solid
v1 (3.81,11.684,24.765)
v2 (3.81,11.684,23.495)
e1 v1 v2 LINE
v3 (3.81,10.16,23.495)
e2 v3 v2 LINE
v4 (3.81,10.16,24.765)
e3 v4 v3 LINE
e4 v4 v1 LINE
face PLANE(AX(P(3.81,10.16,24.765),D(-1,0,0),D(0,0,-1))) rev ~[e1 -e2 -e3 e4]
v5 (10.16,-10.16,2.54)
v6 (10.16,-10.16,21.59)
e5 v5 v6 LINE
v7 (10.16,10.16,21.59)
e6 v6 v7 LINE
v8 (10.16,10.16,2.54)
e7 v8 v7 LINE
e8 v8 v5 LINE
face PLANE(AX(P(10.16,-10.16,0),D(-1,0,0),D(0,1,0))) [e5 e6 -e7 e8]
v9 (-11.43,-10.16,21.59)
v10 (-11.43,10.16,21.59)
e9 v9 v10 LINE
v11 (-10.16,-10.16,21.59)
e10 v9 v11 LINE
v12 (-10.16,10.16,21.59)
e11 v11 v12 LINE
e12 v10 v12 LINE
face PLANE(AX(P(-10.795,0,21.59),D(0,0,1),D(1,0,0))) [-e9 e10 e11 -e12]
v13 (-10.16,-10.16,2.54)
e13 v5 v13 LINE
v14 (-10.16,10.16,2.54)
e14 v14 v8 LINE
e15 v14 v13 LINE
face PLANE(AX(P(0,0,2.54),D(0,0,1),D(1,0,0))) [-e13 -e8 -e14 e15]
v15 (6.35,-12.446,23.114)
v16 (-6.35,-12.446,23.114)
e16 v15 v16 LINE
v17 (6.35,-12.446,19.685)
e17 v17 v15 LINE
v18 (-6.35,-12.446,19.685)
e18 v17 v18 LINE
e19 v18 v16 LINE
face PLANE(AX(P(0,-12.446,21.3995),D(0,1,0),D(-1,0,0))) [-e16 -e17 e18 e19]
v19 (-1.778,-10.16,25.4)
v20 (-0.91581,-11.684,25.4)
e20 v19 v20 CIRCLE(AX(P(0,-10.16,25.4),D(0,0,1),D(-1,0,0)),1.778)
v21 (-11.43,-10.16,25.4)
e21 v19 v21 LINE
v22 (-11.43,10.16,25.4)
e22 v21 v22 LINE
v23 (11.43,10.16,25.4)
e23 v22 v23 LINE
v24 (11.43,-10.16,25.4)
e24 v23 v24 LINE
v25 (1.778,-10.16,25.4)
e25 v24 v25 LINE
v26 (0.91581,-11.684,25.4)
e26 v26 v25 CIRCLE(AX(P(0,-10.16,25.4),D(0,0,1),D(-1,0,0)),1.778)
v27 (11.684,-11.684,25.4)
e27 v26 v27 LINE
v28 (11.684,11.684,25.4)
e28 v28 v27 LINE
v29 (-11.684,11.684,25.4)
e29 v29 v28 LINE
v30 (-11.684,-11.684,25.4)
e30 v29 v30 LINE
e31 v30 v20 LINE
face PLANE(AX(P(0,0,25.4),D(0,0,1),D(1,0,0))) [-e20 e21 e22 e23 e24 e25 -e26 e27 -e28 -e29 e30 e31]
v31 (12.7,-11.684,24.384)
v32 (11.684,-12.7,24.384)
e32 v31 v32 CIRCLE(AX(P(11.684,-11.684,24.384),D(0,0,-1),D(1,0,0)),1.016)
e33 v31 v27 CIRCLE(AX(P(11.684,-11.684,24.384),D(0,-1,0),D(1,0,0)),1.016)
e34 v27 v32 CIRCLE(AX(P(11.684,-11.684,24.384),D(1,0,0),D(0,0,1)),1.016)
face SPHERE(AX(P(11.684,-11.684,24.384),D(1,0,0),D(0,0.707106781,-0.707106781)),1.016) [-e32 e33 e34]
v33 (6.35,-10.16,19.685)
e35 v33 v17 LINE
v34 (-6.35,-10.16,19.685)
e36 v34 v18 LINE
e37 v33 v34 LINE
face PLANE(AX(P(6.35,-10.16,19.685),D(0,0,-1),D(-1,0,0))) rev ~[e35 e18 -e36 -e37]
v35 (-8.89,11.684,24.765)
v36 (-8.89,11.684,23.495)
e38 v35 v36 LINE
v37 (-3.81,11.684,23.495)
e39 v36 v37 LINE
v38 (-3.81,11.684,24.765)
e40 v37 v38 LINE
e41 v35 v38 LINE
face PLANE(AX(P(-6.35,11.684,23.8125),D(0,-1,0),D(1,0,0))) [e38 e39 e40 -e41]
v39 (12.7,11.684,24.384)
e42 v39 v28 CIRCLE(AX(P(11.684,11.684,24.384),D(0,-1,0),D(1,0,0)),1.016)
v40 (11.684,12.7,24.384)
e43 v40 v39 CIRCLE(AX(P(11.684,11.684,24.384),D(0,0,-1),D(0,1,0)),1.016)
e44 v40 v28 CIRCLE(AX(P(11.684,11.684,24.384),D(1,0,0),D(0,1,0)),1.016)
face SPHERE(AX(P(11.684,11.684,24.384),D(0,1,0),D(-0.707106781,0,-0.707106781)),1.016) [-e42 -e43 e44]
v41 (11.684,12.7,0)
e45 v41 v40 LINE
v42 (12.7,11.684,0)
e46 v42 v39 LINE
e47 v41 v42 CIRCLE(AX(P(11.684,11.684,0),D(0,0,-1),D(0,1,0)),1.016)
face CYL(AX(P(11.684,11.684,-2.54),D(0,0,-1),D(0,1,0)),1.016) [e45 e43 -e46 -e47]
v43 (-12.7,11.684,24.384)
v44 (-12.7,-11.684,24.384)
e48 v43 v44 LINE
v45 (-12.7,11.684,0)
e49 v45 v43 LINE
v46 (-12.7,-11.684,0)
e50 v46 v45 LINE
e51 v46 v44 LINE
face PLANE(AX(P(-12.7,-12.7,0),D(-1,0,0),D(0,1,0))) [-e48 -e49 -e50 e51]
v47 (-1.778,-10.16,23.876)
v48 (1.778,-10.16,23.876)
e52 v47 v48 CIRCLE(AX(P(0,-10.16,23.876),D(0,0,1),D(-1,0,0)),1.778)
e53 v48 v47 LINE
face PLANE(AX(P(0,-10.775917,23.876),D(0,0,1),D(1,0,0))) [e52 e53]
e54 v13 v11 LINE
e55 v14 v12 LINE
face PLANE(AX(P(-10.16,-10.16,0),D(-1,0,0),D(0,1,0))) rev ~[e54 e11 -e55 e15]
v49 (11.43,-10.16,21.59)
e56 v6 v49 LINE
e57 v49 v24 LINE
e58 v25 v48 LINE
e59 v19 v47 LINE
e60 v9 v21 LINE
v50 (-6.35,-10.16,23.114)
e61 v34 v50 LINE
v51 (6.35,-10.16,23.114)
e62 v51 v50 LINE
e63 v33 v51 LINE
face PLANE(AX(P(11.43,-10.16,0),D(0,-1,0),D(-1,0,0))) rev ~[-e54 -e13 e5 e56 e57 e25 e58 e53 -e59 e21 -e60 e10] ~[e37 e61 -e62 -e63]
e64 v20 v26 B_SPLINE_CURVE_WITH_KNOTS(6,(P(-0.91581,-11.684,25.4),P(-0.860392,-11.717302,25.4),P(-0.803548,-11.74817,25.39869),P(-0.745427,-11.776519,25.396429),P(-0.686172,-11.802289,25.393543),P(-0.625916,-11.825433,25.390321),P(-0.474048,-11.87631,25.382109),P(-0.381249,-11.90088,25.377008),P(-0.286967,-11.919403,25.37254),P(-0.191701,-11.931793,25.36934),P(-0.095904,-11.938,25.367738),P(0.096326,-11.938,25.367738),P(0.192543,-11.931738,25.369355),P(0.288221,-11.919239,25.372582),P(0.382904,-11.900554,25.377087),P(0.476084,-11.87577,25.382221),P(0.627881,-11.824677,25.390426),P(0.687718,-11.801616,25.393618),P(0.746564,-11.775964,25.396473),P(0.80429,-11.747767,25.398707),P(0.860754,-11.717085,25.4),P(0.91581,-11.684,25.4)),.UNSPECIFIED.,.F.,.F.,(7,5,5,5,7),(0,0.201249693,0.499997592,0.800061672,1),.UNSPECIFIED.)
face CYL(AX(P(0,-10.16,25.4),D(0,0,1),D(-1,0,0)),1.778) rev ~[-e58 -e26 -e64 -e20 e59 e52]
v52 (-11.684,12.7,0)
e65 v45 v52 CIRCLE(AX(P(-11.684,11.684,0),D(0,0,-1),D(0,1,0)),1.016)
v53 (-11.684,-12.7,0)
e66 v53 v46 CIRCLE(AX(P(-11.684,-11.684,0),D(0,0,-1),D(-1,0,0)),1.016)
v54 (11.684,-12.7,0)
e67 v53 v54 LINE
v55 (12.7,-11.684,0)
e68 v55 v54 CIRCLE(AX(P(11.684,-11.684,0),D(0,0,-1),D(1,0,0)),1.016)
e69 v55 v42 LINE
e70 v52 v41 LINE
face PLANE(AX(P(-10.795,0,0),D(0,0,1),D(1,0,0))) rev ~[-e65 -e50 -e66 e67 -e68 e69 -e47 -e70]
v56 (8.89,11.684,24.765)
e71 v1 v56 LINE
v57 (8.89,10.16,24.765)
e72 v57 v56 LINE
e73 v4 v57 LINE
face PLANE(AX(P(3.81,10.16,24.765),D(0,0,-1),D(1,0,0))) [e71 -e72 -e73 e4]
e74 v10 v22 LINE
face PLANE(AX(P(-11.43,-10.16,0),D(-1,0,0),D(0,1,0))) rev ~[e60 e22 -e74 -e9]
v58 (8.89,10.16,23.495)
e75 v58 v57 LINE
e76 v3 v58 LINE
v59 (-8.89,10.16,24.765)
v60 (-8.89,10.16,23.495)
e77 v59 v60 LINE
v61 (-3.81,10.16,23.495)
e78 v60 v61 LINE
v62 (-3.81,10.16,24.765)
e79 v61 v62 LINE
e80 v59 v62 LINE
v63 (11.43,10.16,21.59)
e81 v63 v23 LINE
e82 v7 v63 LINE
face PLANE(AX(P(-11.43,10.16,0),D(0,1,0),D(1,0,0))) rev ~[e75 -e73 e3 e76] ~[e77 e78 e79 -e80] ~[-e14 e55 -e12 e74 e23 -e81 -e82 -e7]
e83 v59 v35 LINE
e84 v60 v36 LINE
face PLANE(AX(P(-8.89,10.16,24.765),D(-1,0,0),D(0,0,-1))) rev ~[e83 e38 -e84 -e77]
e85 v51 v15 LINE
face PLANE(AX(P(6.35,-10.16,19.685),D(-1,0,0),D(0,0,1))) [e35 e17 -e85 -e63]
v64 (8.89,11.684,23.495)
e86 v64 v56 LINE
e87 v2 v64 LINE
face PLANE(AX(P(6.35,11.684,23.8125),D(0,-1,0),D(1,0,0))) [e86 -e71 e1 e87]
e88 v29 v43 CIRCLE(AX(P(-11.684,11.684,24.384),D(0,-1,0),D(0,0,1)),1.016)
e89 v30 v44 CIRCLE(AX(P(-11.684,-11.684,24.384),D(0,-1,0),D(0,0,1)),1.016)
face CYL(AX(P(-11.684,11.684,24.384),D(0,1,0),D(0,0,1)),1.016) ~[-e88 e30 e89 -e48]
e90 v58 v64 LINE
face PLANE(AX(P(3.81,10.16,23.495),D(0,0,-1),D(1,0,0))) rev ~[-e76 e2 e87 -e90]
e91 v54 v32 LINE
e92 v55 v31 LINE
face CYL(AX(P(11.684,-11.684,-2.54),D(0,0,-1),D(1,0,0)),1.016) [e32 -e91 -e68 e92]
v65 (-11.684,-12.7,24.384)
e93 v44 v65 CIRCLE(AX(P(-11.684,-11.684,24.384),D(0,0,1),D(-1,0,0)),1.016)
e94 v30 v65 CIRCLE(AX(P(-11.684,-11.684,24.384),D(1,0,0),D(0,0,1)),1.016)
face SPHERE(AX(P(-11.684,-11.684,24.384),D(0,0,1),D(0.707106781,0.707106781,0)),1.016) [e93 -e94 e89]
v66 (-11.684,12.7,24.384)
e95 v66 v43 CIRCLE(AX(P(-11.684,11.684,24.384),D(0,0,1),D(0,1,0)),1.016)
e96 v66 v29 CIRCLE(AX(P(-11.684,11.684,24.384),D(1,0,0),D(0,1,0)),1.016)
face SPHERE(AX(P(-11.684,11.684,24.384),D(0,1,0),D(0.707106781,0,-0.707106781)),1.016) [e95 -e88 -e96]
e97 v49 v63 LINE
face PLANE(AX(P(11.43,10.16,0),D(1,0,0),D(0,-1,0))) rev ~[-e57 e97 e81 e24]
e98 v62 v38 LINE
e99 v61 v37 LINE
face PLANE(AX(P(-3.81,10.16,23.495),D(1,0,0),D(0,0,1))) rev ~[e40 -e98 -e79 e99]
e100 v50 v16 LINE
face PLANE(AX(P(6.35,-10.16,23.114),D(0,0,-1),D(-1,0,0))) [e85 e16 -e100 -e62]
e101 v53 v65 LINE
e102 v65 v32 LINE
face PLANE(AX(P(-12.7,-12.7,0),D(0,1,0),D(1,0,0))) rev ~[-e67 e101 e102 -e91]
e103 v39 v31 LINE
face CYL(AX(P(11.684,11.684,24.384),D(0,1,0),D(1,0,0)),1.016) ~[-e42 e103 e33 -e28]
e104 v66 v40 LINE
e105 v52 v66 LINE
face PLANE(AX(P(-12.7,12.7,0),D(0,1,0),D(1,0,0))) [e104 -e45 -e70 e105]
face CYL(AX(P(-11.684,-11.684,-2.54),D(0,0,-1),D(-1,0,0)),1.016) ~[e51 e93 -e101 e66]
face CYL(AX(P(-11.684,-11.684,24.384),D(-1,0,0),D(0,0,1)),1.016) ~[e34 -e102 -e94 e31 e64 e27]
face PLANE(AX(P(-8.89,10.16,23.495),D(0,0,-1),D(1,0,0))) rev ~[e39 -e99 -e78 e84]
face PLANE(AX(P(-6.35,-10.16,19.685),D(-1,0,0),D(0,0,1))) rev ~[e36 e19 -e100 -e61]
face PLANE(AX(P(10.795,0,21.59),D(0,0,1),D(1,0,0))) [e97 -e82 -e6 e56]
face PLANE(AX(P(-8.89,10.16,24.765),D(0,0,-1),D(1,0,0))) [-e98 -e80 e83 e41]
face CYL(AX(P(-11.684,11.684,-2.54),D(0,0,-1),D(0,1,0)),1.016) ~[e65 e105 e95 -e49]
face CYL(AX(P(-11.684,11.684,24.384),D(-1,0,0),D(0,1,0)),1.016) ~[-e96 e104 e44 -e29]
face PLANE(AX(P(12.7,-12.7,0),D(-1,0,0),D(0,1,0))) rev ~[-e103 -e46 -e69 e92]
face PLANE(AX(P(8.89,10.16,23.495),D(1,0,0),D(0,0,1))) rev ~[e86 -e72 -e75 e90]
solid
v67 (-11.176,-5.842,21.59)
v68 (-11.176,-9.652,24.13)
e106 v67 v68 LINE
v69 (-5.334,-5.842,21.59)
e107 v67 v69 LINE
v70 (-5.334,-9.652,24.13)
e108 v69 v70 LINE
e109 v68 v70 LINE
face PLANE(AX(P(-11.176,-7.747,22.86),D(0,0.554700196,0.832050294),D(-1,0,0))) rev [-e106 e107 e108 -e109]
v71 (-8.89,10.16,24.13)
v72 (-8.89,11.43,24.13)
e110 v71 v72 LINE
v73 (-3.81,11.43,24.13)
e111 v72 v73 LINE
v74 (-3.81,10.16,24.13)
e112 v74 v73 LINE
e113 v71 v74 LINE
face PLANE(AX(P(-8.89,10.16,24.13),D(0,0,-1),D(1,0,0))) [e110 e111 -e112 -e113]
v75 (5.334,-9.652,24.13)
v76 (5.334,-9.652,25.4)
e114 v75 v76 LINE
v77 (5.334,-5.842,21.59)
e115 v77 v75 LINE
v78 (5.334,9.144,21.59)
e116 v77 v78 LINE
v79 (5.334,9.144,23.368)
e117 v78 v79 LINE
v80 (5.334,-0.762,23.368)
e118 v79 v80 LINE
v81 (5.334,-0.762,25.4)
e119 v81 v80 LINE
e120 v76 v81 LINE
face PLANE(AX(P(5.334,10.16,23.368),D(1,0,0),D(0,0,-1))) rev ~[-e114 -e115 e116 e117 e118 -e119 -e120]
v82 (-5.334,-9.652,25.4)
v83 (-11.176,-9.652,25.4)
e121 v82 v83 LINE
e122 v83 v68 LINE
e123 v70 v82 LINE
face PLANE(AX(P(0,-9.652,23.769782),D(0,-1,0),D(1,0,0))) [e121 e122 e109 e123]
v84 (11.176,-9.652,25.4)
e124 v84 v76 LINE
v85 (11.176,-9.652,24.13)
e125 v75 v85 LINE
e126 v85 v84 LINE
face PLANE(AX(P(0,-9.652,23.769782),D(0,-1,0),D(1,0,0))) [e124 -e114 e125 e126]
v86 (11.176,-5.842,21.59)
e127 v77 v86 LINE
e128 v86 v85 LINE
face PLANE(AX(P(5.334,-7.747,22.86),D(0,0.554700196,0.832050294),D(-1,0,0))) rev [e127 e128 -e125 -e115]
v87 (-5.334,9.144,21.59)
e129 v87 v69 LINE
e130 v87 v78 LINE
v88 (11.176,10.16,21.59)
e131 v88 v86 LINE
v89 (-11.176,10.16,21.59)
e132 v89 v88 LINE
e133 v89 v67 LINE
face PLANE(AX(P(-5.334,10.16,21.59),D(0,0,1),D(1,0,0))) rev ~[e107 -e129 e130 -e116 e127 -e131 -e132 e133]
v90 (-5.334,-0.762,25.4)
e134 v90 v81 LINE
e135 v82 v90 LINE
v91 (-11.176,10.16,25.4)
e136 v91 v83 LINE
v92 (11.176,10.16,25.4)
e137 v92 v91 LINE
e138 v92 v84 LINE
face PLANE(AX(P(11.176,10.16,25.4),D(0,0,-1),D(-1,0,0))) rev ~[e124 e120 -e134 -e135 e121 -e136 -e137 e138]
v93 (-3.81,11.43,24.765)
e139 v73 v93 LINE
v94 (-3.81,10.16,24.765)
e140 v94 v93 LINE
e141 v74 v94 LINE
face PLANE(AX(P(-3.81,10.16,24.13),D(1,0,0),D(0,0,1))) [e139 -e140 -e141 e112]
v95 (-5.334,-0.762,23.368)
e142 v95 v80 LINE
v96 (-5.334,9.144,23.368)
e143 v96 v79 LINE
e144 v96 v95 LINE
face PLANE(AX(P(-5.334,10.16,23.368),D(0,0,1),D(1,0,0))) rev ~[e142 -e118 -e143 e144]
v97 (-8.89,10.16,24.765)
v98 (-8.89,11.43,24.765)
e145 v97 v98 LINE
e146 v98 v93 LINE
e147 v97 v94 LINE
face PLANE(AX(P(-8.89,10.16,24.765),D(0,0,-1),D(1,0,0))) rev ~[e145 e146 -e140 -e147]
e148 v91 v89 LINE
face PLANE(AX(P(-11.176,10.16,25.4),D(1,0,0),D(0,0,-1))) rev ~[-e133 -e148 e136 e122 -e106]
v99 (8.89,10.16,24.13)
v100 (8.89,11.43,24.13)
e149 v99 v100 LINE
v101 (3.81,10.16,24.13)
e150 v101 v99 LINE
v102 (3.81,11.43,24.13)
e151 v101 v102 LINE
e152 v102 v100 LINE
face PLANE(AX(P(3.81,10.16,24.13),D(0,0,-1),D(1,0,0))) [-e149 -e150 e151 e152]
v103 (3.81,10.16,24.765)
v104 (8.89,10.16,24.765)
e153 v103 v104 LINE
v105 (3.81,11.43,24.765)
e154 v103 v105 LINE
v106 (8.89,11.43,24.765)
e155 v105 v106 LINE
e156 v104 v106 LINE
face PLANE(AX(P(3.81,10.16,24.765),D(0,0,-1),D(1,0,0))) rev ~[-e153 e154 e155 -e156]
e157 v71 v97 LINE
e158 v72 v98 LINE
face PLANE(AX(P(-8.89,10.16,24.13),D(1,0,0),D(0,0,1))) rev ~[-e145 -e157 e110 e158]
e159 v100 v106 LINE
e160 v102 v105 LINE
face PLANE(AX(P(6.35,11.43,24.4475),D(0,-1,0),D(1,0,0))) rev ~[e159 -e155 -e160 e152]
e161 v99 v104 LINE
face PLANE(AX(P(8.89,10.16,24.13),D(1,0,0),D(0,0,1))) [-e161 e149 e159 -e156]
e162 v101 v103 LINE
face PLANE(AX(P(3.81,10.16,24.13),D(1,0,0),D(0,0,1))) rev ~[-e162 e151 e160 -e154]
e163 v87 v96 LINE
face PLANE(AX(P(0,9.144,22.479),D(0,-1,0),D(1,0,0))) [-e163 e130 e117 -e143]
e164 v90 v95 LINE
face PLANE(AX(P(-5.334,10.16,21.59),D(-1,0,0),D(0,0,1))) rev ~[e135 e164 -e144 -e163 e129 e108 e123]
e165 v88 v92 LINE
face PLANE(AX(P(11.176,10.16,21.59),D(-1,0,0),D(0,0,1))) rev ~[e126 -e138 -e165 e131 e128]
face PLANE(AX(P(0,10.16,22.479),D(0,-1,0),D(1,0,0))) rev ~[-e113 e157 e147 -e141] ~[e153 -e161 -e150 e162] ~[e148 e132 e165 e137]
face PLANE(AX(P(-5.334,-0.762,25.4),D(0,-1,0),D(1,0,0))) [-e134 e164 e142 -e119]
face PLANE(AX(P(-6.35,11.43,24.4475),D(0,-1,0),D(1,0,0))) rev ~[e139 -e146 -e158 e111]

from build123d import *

# Parameters (mm, degrees)
F0_W          = 25.4
F0_H          = 25.4
F1_DEPTH      = 25.4
F0_W_2        = 1.27
F0_H_2        = 20.32
F0_W_3        = 20.32
F2_DEPTH      = 2.54
F3_DEPTH      = 21.59
F4_W          = 28.194
F4_H          = 28.194
F4_W_2        = 25.654
F4_H_2        = 25.654
F4_W_3        = 25.4
F4_H_3        = 25.4
F4_W_4        = 22.86
F4_H_4        = 20.32
F5_DEPTH      = 1.27
F6_DEPTH      = 2.54
F8_W          = 5.08
F8_H          = 0.635
F9_DEPTH      = 1.524
F10_W         = 12.7
F10_H         = 3.429
F11_DEPTH     = 2.286
F13_DEPTH     = 1.524
F14_DEPTH     = 1.27
F15_DEPTH     = 19.812
F8_W_2        = 10.668
F8_H_2        = 1.778
F16_DEPTH     = 1.016
F17_W         = 10.668
F17_H         = 8.89
F18_DEPTH     = 5.08
F19_C1_SIZE2  = 2.54
F19_C1_SIZE   = 3.81
F19_C2_SIZE2  = 2.54
F19_C2_SIZE   = 3.81
F20_T1_DEPTH  = 26.924
F20_T3_DEPTH  = 23.368
F20_T5_DEPTH  = 23.368
F20_S9_W      = 1.016
F20_S9_H      = 1.016
F20_T10_DEPTH = 1.016
F20_S15_W     = 1.016
F20_S15_H     = 1.016
F20_T16_DEPTH = 1.016
F20_S21_W     = 1.016
F20_S21_H     = 1.016
F20_T22_DEPTH = 1.016
F20_S27_W     = 1.016
F20_S27_H     = 1.016
F20_T28_DEPTH = 1.016


# Not quite as in the source:
# - a fillet or chamfer that OpenCascade refuses, or shapes differently, is made with other operations: its cross-section is extruded or revolved along the edge and cut away or added


with BuildPart() as f1:
    # F0 (on Top) → F1 (new body)
    with BuildSketch(Plane.XY):
        Rectangle(F0_W, F0_H)
        Polygon((10.16, 10.16), (11.43, 10.16), (11.43, -10.16), (10.16, -10.16), (-10.16, -10.16), (-11.43, -10.16), (-11.43, 10.16), (-10.16, 10.16), align=None, mode=Mode.SUBTRACT)
    extrude(amount=F1_DEPTH)

    # F0 (on Top) → F2 (join)
    with BuildSketch(Plane.XY):
        Rectangle(F0_W, F0_H)
        Polygon((10.16, 10.16), (11.43, 10.16), (11.43, -10.16), (10.16, -10.16), (-10.16, -10.16), (-11.43, -10.16), (-11.43, 10.16), (-10.16, 10.16), align=None, mode=Mode.SUBTRACT)
        with Locations((10.795, 0)):
            Rectangle(F0_W_2, F0_H_2)
        Rectangle(F0_W_3, F0_H_2)
        with Locations((-10.795, 0)):
            Rectangle(F0_W_2, F0_H_2)
    extrude(amount=F2_DEPTH)

    # F0 (on Top) → F3 (join)
    with BuildSketch(Plane.XY):
        with Locations((-10.795, 0)):
            Rectangle(F0_W_2, F0_H_2)
        with Locations((10.795, 0)):
            Rectangle(F0_W_2, F0_H_2)
    extrude(amount=F3_DEPTH)

    # F8 (on face) → F9 (cut)
    with BuildSketch(Plane.XZ.offset(-10.16)):
        with Locations((-6.35, 23.8125)):
            Rectangle(F8_W, F8_H)
        with Locations((-6.35, 24.4475)):
            Rectangle(F8_W, F8_H)
        with Locations((6.35, 23.8125)):
            Rectangle(F8_W, F8_H)
        with Locations((6.35, 24.4475)):
            Rectangle(F8_W, F8_H)
    extrude(amount=-F9_DEPTH, mode=Mode.SUBTRACT)

    # F10 (on face) → F11 (cut)
    with BuildSketch(Plane(origin=(0, -10.16, 0), x_dir=(-1, 0, 0), z_dir=(0, 1, 0))):
        with Locations((0, 21.3995)):
            Rectangle(F10_W, F10_H)
    extrude(amount=-F11_DEPTH, mode=Mode.SUBTRACT)

    # F12 (on face) → F13 (cut)
    with BuildSketch(Plane.XY.offset(25.4)):
        with BuildLine():
            Line((1.778, -10.16), (-1.778, -10.16))
            ThreePointArc((-1.778, -10.16), (0, -11.938), (1.778, -10.16))
        make_face()
    extrude(amount=-F13_DEPTH, mode=Mode.SUBTRACT)

    # F20: fillet of radius 1.016 on 8 edges, made by hand

    # F20_s2 → F20_t1 (cut)
    with BuildSketch(Plane.XY.offset(-2.54)):
        with BuildLine():
            ThreePointArc((12.7, -11.684), (12.4024204897, -12.4024204897), (11.684, -12.7))
            Line((11.684, -12.7), (12.7, -12.7))
            Line((12.7, -12.7), (12.7, -11.684))
        make_face()
        with BuildLine():
            ThreePointArc((-12.7, -11.684), (-12.4024204897, -12.4024204897), (-11.684, -12.7))
            Line((-11.684, -12.7), (-12.7, -12.7))
            Line((-12.7, -12.7), (-12.7, -11.684))
        make_face()
        with BuildLine():
            ThreePointArc((11.684, 12.7), (12.4024204897, 12.4024204897), (12.7, 11.684))
            Line((12.7, 11.684), (12.7, 12.7))
            Line((12.7, 12.7), (11.684, 12.7))
        make_face()
        with BuildLine():
            ThreePointArc((-11.684, 12.7), (-12.4024204897, 12.4024204897), (-12.7, 11.684))
            Line((-12.7, 11.684), (-12.7, 12.7))
            Line((-12.7, 12.7), (-11.684, 12.7))
        make_face()
    extrude(amount=F20_T1_DEPTH, mode=Mode.SUBTRACT)

    # F20_s4 → F20_t3 (cut)
    with BuildSketch(Plane.XZ.offset(-11.684)):
        with BuildLine():
            ThreePointArc((12.7, 24.384), (12.4024204897, 25.1024204897), (11.684, 25.4))
            Line((11.684, 25.4), (12.7, 25.4))
            Line((12.7, 25.4), (12.7, 24.384))
        make_face()
        with BuildLine():
            ThreePointArc((-11.684, 25.4), (-12.4024204897, 25.1024204897), (-12.7, 24.384))
            Line((-12.7, 24.384), (-12.7, 25.4))
            Line((-12.7, 25.4), (-11.684, 25.4))
        make_face()
    extrude(amount=F20_T3_DEPTH, mode=Mode.SUBTRACT)

    # F20_s6 → F20_t5 (cut)
    with BuildSketch(Plane.YZ.offset(-11.684)):
        with BuildLine():
            ThreePointArc((-11.684, 25.4), (-12.4024204897, 25.1024204897), (-12.7, 24.384))
            Line((-12.7, 24.384), (-12.7, 25.4))
            Line((-12.7, 25.4), (-11.684, 25.4))
        make_face()
        with BuildLine():
            ThreePointArc((12.7, 24.384), (12.4024204897, 25.1024204897), (11.684, 25.4))
            Line((11.684, 25.4), (12.7, 25.4))
            Line((12.7, 25.4), (12.7, 24.384))
        make_face()
    extrude(amount=F20_T5_DEPTH, mode=Mode.SUBTRACT)


with BuildPart() as f5:
    # F4 (on face) → F5 (new body)
    with BuildSketch(Plane.XY.offset(25.4)):
        Rectangle(F4_W, F4_H)
        Rectangle(F4_W_2, F4_H_2, mode=Mode.SUBTRACT)
        Rectangle(F4_W_2, F4_H_2)
        Rectangle(F4_W_3, F4_H_3, mode=Mode.SUBTRACT)
        Rectangle(F4_W_3, F4_H_3)
        Rectangle(F4_W_4, F4_H_4, mode=Mode.SUBTRACT)
        Rectangle(F4_W_4, F4_H_4)
    extrude(amount=F5_DEPTH)

    # F4 (on face) → F6 (join)
    with BuildSketch(Plane.XY.offset(25.4)):
        Rectangle(F4_W, F4_H)
        Rectangle(F4_W_2, F4_H_2, mode=Mode.SUBTRACT)
    extrude(amount=-F6_DEPTH)


with BuildPart() as f14:
    # F8 (on face) → F14 (new body)
    with BuildSketch(Plane.XZ.offset(-10.16)):
        with Locations((6.35, 24.4475)):
            Rectangle(F8_W, F8_H)
    extrude(amount=-F14_DEPTH)



with BuildPart() as f14b:
    # F8 (on face) → F14, piece 2 (new body)
    with BuildSketch(Plane.XZ.offset(-10.16)):
        with Locations((-6.35, 24.4475)):
            Rectangle(F8_W, F8_H)
    extrude(amount=-F14_DEPTH)


with BuildPart() as f14_1:
    add(f14.part)

    add(f14b.part)  # F15 merges F14b
    # F8 (on face) → F15 (join)
    with BuildSketch(Plane.XZ.offset(-10.16)):
        Polygon((-5.334, 23.368), (5.334, 23.368), (5.334, 21.59), (10.16, 21.59), (11.176, 21.59), (11.176, 25.4), (-11.176, 25.4), (-11.176, 21.59), (-10.16, 21.59), (-5.334, 21.59), align=None)
        Polygon((-8.89, 24.13), (-8.89, 24.765), (-3.81, 24.765), (-3.81, 24.13), (-3.81, 23.495), (-8.89, 23.495), align=None, mode=Mode.SUBTRACT)
        Polygon((3.81, 24.13), (3.81, 24.765), (8.89, 24.765), (8.89, 24.13), (8.89, 23.495), (3.81, 23.495), align=None, mode=Mode.SUBTRACT)
        with Locations((6.35, 24.4475)):
            Rectangle(F8_W, F8_H)
        with Locations((6.35, 23.8125)):
            Rectangle(F8_W, F8_H)
        with Locations((-6.35, 24.4475)):
            Rectangle(F8_W, F8_H)
        with Locations((-6.35, 23.8125)):
            Rectangle(F8_W, F8_H)
    extrude(amount=F15_DEPTH)

    # F8 (on face) → F16 (join)
    with BuildSketch(Plane.XZ.offset(-10.16)):
        with Locations((0, 22.479)):
            Rectangle(F8_W_2, F8_H_2)
    extrude(amount=F16_DEPTH)

    # F17 (on face) → F18 (cut)
    with BuildSketch(Plane.XY.offset(25.4)):
        with Locations((0, -5.207)):
            Rectangle(F17_W, F17_H)
    extrude(amount=-F18_DEPTH, mode=Mode.SUBTRACT)

    # F19: chamfer of 2.54 x 3.81 on 2 edges, made by hand

    # F19_c1
    f19_c1_edges = [f14_1.edges().sort_by_distance(p)[0] for p in [
        (8.255, -9.652, 21.59),
    ]]
    f19_c1_side = f14_1.faces().sort_by_distance((8.255, -9.6012, 21.59))[0]
    chamfer(f19_c1_edges, length=F19_C1_SIZE, length2=F19_C1_SIZE2, reference=f19_c1_side)

    # F19_c2
    f19_c2_edges = [f14_1.edges().sort_by_distance(p)[0] for p in [
        (-8.255, -9.652, 21.59),
    ]]
    f19_c2_side = f14_1.faces().sort_by_distance((-8.255, -9.6012, 21.59))[0]
    chamfer(f19_c2_edges, length=F19_C2_SIZE, length2=F19_C2_SIZE2, reference=f19_c2_side)


with BuildPart() as f20_tool8:
    # F20_s9 → F20_t10 (new body)
    with BuildSketch(Plane.YZ.offset(11.684)):
        with Locations((-12.192, 24.892)):
            Rectangle(F20_S9_W, F20_S9_H)
    extrude(amount=F20_T10_DEPTH)

    # F20_s11 → F20_t12 (revolve, cut)
    with BuildSketch(Plane(origin=(11.684, -11.684, 24.384), x_dir=(0, 0.7071067812, -0.7071067812), z_dir=(0, -0.7071067812, -0.7071067812))):
        with BuildLine():
            ThreePointArc((0, -1.016), (1.016, 0), (0, 1.016))
            Line((0, 1.016), (0, -1.016))
        make_face()
    revolve(axis=Axis((11.684, -11.684, 24.384), (1, 0, 0)), mode=Mode.SUBTRACT)


with BuildPart() as f1_1:
    add(f1.part)

    # F20_t7: cut F20_tool8
    add(f20_tool8.part, mode=Mode.SUBTRACT)


with BuildPart() as f20_tool14:
    # F20_s15 → F20_t16 (new body)
    with BuildSketch(Plane.XZ.offset(-11.684)):
        with Locations((12.192, 24.892)):
            Rectangle(F20_S15_W, F20_S15_H)
    extrude(amount=-F20_T16_DEPTH)

    # F20_s17 → F20_t18 (revolve, cut)
    with BuildSketch(Plane(origin=(11.684, 11.684, 24.384), x_dir=(-0.7071067812, 0, -0.7071067812), z_dir=(0.7071067812, 0, -0.7071067812))):
        with BuildLine():
            ThreePointArc((0, -1.016), (1.016, 0), (0, 1.016))
            Line((0, 1.016), (0, -1.016))
        make_face()
    revolve(axis=Axis((11.684, 11.684, 24.384), (0, 1, 0)), mode=Mode.SUBTRACT)


with BuildPart() as f1_2:
    add(f1_1.part)

    # F20_t13: cut F20_tool14
    add(f20_tool14.part, mode=Mode.SUBTRACT)


with BuildPart() as f20_tool20:
    # F20_s21 → F20_t22 (new body)
    with BuildSketch(Plane.XY.offset(24.384)):
        with Locations((-12.192, -12.192)):
            Rectangle(F20_S21_W, F20_S21_H)
    extrude(amount=F20_T22_DEPTH)

    # F20_s23 → F20_t24 (revolve, cut)
    with BuildSketch(Plane(origin=(-11.684, -11.684, 24.384), x_dir=(0.7071067812, 0.7071067812, 0), z_dir=(0.7071067812, -0.7071067812, 0))):
        with BuildLine():
            ThreePointArc((0, -1.016), (1.016, 0), (0, 1.016))
            Line((0, 1.016), (0, -1.016))
        make_face()
    revolve(axis=Axis((-11.684, -11.684, 24.384), (0, 0, 1)), mode=Mode.SUBTRACT)


with BuildPart() as f1_3:
    add(f1_2.part)

    # F20_t19: cut F20_tool20
    add(f20_tool20.part, mode=Mode.SUBTRACT)


with BuildPart() as f20_tool26:
    # F20_s27 → F20_t28 (new body)
    with BuildSketch(Plane.XZ.offset(-11.684)):
        with Locations((-12.192, 24.892)):
            Rectangle(F20_S27_W, F20_S27_H)
    extrude(amount=-F20_T28_DEPTH)

    # F20_s29 → F20_t30 (revolve, cut)
    with BuildSketch(Plane(origin=(-11.684, 11.684, 24.384), x_dir=(0.7071067812, 0, -0.7071067812), z_dir=(0.7071067812, 0, 0.7071067812))):
        with BuildLine():
            ThreePointArc((0, -1.016), (1.016, 0), (0, 1.016))
            Line((0, 1.016), (0, -1.016))
        make_face()
    revolve(axis=Axis((-11.684, 11.684, 24.384), (0, 1, 0)), mode=Mode.SUBTRACT)


with BuildPart() as f1_4:
    add(f1_3.part)

    # F20_t25: cut F20_tool26
    add(f20_tool26.part, mode=Mode.SUBTRACT)


solid = Compound([f14_1.part, f1_4.part])
